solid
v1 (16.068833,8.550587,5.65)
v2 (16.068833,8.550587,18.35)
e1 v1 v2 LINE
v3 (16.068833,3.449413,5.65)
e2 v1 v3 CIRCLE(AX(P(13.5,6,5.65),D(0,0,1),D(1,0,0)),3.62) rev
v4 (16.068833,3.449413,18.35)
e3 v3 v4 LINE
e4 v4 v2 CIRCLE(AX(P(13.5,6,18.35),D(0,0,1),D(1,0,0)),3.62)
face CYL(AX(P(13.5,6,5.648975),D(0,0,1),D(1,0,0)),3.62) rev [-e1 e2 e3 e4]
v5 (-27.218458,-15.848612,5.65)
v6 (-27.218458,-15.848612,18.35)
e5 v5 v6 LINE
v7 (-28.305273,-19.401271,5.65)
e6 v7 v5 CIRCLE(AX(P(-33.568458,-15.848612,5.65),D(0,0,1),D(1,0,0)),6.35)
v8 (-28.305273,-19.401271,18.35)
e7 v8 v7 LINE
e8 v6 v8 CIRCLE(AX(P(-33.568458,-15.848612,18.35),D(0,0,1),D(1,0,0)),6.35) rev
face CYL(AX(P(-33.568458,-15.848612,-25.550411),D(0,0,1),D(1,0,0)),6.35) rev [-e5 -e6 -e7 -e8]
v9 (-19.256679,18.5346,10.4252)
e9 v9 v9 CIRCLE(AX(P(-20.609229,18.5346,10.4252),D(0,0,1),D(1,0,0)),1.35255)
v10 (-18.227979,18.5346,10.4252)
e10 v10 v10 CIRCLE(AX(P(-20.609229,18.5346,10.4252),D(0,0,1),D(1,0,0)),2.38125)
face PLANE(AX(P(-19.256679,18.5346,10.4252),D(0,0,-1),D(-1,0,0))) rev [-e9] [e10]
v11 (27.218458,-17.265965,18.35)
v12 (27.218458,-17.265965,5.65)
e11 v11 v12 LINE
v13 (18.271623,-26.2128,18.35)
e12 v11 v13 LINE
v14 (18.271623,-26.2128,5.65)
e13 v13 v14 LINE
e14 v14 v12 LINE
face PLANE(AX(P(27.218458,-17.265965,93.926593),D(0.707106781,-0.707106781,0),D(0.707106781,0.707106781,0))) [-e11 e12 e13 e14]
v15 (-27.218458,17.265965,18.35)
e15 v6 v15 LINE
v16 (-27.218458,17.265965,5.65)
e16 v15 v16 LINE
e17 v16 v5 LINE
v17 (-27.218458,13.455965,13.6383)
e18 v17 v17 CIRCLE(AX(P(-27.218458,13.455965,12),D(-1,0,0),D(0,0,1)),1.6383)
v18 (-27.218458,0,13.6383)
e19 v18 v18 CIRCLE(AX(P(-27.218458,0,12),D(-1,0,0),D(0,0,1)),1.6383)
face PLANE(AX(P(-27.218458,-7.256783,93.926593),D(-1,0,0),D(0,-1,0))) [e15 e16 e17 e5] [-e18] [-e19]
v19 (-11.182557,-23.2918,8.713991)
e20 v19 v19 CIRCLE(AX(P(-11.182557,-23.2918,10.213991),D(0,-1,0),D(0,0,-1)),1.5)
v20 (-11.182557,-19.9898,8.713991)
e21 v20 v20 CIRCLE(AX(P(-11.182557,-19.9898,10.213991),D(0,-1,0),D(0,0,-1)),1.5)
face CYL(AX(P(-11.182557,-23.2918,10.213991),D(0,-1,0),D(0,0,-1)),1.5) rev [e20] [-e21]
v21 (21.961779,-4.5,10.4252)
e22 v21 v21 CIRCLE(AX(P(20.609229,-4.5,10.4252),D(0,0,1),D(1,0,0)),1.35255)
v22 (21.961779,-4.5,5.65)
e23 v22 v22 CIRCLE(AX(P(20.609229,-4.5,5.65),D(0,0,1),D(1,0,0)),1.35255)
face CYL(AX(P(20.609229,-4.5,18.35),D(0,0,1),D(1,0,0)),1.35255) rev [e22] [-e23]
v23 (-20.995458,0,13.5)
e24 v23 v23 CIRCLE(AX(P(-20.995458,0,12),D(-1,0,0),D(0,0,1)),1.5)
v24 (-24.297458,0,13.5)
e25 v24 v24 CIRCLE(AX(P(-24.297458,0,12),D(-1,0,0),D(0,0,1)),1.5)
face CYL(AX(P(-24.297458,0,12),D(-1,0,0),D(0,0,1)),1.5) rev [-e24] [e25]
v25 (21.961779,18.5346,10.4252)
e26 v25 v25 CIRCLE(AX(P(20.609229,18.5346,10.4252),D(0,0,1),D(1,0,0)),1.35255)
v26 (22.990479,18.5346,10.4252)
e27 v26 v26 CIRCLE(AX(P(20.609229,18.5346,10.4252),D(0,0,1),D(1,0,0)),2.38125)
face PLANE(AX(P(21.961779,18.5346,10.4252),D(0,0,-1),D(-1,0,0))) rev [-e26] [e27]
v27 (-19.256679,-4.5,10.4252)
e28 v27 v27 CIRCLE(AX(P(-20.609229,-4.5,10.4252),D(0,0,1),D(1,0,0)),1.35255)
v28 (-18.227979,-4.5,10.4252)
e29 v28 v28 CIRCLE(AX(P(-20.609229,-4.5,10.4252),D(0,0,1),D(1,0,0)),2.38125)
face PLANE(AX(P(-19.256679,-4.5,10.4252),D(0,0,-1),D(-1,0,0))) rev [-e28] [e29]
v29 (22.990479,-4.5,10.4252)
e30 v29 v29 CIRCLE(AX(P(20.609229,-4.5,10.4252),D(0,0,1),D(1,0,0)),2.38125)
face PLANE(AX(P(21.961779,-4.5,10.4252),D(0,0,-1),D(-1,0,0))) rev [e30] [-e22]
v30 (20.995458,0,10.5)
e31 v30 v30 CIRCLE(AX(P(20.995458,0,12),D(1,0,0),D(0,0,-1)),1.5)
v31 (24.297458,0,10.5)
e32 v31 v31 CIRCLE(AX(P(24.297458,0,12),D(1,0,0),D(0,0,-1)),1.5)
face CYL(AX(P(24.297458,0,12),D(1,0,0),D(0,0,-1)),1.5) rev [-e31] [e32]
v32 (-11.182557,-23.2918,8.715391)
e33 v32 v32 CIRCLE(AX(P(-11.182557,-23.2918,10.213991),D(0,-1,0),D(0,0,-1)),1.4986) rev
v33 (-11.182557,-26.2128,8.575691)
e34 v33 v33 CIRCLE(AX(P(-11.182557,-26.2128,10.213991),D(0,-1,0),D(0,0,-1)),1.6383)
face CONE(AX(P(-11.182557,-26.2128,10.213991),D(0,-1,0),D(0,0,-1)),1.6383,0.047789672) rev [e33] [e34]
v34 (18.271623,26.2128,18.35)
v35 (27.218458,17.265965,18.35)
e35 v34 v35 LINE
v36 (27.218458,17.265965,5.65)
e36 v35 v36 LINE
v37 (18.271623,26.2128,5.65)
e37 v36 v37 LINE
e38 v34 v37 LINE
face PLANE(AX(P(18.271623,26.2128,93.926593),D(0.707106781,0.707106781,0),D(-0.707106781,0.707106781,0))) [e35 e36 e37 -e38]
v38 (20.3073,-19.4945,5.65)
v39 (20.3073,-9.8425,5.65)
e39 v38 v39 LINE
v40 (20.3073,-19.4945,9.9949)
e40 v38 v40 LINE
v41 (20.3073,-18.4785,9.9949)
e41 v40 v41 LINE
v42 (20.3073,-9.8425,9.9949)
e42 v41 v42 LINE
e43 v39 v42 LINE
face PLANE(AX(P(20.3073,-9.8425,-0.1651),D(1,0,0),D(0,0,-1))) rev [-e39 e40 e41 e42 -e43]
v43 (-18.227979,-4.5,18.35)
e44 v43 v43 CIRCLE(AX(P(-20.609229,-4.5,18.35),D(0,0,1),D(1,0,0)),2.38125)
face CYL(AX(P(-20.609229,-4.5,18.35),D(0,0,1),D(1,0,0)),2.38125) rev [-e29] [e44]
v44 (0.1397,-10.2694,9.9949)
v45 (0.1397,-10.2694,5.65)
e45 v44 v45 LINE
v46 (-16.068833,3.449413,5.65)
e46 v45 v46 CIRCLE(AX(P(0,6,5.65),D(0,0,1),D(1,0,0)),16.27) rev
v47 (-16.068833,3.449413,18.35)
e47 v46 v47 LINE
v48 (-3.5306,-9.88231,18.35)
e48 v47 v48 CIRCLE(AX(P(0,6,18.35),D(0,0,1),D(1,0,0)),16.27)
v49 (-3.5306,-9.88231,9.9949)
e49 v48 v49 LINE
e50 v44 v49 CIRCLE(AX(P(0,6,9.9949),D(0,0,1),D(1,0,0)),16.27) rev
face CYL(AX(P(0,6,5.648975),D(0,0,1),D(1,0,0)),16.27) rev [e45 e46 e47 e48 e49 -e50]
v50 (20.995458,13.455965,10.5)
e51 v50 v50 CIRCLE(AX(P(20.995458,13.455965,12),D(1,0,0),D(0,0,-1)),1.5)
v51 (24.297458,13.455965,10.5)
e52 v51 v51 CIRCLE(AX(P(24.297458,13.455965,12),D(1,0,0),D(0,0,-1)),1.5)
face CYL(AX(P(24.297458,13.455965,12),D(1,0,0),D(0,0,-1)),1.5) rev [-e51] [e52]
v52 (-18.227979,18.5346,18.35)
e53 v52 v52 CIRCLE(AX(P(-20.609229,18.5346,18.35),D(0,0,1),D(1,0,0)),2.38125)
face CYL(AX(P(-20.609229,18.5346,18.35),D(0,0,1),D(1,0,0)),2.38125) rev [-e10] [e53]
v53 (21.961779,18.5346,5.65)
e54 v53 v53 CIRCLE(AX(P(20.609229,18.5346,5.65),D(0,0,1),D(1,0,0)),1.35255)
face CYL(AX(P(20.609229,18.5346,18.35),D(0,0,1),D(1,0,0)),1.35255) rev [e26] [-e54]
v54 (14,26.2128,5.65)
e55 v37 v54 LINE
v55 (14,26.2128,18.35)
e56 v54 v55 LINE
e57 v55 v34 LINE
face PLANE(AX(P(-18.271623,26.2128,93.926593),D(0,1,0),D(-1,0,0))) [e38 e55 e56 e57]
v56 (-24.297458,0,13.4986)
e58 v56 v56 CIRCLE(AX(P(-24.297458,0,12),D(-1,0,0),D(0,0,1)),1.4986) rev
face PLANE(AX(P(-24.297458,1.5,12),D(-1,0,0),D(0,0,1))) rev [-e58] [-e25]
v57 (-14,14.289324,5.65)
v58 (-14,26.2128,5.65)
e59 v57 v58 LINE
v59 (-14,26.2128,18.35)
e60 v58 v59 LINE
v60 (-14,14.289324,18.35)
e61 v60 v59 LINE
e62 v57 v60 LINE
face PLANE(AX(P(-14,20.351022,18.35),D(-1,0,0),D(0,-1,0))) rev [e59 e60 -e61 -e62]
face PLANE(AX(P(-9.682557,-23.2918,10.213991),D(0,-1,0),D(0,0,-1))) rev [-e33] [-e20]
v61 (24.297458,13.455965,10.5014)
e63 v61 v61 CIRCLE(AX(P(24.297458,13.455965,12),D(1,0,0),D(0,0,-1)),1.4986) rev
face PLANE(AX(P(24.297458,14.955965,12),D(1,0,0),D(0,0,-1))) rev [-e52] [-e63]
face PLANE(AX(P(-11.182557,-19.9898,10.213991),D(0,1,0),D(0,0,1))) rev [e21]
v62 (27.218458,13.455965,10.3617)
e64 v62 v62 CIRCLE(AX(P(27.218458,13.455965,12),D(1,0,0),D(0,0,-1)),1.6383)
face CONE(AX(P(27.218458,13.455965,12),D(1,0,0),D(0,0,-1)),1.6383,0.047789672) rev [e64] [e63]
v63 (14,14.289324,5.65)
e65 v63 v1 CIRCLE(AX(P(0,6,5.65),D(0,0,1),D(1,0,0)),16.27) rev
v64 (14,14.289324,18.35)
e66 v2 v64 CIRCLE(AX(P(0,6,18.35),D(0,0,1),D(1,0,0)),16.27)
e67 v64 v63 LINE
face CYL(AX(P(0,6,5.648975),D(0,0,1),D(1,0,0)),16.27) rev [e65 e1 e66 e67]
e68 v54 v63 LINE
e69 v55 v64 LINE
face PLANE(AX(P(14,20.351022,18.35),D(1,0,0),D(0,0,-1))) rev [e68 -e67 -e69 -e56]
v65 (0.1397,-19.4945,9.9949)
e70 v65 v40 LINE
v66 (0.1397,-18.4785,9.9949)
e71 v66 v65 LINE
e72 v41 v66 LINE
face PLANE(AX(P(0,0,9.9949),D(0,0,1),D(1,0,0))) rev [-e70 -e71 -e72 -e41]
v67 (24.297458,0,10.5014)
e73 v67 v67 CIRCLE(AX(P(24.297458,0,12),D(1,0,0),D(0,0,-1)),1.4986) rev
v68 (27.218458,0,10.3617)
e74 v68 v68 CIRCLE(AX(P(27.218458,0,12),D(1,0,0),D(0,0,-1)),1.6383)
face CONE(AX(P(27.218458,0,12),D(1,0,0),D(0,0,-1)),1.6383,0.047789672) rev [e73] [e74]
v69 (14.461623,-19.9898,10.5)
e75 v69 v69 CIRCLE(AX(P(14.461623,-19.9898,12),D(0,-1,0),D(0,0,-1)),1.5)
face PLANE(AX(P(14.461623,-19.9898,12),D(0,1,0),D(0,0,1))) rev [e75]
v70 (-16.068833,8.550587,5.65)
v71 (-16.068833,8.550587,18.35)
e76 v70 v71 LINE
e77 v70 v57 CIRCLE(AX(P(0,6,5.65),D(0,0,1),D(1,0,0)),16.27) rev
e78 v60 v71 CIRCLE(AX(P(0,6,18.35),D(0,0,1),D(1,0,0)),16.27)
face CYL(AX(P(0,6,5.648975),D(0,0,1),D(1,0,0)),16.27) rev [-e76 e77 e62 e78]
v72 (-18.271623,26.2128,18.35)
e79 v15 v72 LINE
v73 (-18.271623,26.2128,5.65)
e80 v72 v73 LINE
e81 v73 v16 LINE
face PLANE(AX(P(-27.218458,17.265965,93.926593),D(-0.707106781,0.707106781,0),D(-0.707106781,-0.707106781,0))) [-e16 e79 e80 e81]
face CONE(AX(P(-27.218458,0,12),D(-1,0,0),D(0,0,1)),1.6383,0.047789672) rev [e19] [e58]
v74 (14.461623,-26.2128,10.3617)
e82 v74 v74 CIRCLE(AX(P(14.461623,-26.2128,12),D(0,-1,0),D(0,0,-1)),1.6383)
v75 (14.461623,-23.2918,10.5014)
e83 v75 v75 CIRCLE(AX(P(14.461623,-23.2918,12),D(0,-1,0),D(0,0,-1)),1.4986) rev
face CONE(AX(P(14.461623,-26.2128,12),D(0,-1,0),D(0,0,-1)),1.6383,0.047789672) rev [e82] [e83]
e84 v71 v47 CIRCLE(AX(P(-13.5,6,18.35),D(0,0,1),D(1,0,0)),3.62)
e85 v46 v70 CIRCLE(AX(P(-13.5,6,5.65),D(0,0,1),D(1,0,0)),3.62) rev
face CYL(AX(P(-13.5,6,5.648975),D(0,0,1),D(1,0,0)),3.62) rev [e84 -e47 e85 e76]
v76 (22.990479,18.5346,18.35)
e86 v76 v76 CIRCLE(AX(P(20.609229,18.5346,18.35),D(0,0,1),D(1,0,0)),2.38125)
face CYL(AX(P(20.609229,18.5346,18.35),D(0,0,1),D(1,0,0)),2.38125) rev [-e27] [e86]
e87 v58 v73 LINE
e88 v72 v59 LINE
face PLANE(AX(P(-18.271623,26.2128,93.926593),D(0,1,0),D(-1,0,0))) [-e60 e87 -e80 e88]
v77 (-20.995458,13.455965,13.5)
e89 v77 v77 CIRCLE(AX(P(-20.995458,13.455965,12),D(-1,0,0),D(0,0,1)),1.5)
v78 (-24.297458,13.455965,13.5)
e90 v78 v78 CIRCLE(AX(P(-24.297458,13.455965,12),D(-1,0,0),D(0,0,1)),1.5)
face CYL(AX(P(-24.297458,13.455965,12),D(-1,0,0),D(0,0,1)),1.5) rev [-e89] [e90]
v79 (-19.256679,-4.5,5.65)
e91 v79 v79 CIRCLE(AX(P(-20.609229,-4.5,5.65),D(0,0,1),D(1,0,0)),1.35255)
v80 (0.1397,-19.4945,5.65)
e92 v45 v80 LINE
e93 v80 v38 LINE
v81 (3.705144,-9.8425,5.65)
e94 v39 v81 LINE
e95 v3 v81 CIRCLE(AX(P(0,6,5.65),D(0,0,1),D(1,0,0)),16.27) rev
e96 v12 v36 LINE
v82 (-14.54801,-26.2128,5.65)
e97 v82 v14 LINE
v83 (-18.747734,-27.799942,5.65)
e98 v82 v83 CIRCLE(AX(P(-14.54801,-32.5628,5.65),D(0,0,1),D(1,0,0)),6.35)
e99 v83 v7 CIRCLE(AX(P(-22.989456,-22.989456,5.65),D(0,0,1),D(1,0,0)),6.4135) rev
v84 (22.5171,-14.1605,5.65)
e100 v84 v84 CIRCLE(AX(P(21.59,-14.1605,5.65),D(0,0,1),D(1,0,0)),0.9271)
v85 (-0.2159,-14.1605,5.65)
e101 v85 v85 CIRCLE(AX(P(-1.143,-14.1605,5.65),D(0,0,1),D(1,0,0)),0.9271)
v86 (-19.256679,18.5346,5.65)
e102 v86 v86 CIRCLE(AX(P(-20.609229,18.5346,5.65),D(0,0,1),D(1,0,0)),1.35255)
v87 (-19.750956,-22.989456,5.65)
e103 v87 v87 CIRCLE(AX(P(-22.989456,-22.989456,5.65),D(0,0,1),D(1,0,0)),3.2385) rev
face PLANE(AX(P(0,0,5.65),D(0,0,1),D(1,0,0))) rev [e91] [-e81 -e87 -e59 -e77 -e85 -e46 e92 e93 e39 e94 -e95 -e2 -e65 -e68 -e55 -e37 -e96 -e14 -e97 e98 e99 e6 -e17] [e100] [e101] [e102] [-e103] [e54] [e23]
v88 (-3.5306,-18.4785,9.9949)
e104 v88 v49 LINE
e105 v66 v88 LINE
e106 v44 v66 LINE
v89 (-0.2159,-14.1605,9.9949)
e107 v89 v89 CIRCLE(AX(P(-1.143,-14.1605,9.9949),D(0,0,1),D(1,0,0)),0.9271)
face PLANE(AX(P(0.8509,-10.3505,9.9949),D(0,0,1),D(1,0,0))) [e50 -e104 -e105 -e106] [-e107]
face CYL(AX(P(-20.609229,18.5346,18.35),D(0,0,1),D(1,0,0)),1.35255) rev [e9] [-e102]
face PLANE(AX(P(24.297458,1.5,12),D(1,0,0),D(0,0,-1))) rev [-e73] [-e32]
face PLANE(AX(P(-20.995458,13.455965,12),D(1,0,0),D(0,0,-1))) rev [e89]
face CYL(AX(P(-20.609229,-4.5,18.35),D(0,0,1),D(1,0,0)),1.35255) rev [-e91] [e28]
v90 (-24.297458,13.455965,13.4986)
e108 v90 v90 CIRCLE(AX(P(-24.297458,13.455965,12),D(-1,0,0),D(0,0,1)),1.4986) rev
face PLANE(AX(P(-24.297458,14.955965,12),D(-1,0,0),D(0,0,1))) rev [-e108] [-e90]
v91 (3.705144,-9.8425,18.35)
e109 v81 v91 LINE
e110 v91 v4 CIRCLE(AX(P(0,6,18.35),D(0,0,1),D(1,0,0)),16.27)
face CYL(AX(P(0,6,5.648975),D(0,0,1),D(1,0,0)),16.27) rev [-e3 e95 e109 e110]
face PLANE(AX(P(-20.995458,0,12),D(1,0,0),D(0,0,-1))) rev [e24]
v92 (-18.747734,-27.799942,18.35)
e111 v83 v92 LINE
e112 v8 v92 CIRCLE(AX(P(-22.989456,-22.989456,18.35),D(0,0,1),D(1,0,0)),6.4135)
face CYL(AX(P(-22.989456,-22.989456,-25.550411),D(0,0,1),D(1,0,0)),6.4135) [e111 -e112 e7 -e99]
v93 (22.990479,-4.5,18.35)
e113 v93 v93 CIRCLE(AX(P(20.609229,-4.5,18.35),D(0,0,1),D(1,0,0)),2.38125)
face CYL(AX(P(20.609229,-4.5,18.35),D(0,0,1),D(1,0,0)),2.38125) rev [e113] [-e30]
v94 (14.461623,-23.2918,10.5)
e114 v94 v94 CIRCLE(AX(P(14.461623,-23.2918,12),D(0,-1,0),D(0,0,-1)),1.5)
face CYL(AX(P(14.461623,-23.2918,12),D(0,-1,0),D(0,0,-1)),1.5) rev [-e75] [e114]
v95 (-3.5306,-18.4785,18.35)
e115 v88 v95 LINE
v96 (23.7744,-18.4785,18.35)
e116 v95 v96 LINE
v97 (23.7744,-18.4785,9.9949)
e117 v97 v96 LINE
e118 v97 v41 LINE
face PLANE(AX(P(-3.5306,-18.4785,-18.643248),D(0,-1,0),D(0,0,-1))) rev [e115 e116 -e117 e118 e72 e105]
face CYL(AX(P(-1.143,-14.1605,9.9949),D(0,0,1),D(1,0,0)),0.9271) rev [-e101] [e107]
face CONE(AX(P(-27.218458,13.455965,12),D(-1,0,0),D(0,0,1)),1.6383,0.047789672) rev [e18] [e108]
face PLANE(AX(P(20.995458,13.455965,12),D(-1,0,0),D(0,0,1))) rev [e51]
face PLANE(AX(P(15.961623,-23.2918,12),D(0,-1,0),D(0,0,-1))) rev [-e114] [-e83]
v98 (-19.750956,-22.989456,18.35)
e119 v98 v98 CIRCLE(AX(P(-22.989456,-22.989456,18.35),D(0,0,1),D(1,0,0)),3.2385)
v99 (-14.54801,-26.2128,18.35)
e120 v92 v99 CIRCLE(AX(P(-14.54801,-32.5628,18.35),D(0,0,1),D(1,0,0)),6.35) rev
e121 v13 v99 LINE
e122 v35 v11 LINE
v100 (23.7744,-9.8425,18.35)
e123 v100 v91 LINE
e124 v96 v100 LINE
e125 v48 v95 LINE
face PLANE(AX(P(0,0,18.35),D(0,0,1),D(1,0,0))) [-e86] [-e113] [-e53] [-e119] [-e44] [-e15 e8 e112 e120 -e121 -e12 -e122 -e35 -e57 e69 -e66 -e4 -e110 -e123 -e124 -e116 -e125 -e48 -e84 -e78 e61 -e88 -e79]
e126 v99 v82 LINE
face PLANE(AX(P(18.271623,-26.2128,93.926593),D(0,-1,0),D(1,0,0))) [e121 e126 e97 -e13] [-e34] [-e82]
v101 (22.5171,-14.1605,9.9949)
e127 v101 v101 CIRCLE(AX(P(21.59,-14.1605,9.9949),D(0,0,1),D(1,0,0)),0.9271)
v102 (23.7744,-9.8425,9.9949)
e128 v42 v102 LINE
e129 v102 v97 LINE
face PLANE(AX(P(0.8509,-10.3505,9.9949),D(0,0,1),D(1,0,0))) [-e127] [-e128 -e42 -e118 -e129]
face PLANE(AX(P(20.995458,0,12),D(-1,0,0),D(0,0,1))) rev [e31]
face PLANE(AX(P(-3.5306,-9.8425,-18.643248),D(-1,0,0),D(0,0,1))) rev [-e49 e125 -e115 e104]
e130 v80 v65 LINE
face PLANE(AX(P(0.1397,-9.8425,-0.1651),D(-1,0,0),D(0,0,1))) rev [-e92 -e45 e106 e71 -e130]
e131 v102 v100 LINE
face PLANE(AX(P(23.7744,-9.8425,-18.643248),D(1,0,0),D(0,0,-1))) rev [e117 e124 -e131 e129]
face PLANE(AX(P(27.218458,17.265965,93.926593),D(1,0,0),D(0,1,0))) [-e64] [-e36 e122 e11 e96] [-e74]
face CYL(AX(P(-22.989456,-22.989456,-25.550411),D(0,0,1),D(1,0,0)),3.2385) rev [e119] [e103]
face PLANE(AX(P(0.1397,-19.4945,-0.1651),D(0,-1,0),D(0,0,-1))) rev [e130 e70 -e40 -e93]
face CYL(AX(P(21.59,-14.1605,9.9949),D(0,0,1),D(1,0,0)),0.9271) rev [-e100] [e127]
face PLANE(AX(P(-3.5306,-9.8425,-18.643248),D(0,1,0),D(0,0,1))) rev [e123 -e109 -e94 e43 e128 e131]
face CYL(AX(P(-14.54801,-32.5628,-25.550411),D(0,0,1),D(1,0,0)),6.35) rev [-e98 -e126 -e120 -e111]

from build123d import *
from build123d.topology import SkipClean

# Parameters (mm, degrees)
SKETCH1_R                                       = 24.7015
SKETCH1_R_2                                     = 7.9375
BOSS_EXTRUDE1_DEPTH                             = 5.65
CBORE_SLOT_FOR_2_PAN_HEAD_MACHINE_SCREW_DEPTH   = 7
CBORE_SLOT_FOR_2_PAN_HEAD_MACHINE_S_3_DEPTH     = 1.5748
BOSS_EXTRUDE5_DEPTH                             = 12.7
BOSS_EXTRUDE8_DEPTH                             = 18.35
CUT_EXTRUDE3_DEPTH                              = 5.65
BOSS_EXTRUDE10_START                            = -12.7
SKETCH49_R                                      = 3.2385
BOSS_EXTRUDE10_DEPTH                            = 12.7
FILLET6_R                                       = 6.35
CBORE_FOR_2_PAN_HEAD_MACHINE_SCREW1_D           = 2.7051
CBORE_FOR_2_PAN_HEAD_MACHINE_SCREW1_CBORE_D     = 4.7625
CBORE_FOR_2_PAN_HEAD_MACHINE_SCREW1_CBORE_DEPTH = 7.9248
CUT_EXTRUDE5_START                              = -8.3551
SKETCH53_W                                      = 27.305
SKETCH53_H                                      = 8.636
CUT_EXTRUDE5_DEPTH                              = 8.3551
SKETCH54_W                                      = 20.1676
SKETCH54_H                                      = 9.652
CUT_EXTRUDE6_DEPTH                              = 10.16
CUT_EXTRUDE7_DEPTH                              = 44.478242884
CUT_EXTRUDE7_DEPTH_BACK                         = 44.478242884
SKETCH55_W                                      = 28
SKETCH55_H                                      = 5.861777857
F_0_CLEARANCE_HOLE1_D                           = 1.8542
FILLET7_R                                       = 6.35
SKETCH61_W                                      = 1.5
SKETCH61_H                                      = 3.302
SKETCH61_AT_POINT_2_W                           = 1.5
SKETCH61_AT_POINT_2_H                           = 3.302
SKETCH61_AT_POINT_3_W                           = 1.5
SKETCH61_AT_POINT_3_H                           = 3.302
SKETCH61_AT_POINT_4_W                           = 1.5
SKETCH61_AT_POINT_4_H                           = 3.302
SKETCH61_AT_POINT_5_W                           = 1.5
SKETCH61_AT_POINT_5_H                           = 3.302
SKETCH61_AT_POINT_6_W                           = 1.5
SKETCH61_AT_POINT_6_H                           = 3.302
CUT_EXTRUDE8_REACH                              = 45.478


with BuildPart() as part:
    # Sketch1 → Boss-Extrude1 (new body)
    with BuildSketch(Plane.XY):
        with Locations(Location((0, 0, 0), (0, 0, 180))):
            Circle(SKETCH1_R)
        with Locations(Location((0, 0, 0), (0, 0, 180))):
            Circle(SKETCH1_R_2, mode=Mode.SUBTRACT)
    extrude(amount=BOSS_EXTRUDE1_DEPTH)

    # CBORE SLOT for #2 Pan Head Machine Screw1: read off the stored shape, not the designer's step
    # CBORE SLOT for _2 Pan Head Machine S 2 → CBORE SLOT for #2 Pan Head Machine Screw1 (cut)
    with BuildSketch(Plane.XY):
        with BuildLine():
            ThreePointArc((-6.14045, 18.210667628), (-7.493, 19.563217628), (-8.84555, 18.210667628))
            Line((-8.84555, 18.210667628), (-8.84555, 14.565767628))
            ThreePointArc((-8.84555, 14.565767628), (-7.493, 13.213217628), (-6.14045, 14.565767628))
            Line((-6.14045, 14.565767628), (-6.14045, 18.210667628))
        make_face()
        with BuildLine():
            ThreePointArc((3.35915, 18.210667628), (2.0066, 19.563217628), (0.65405, 18.210667628))
            Line((0.65405, 18.210667628), (0.65405, 14.565767628))
            ThreePointArc((0.65405, 14.565767628), (2.0066, 13.213217628), (3.35915, 14.565767628))
            Line((3.35915, 14.565767628), (3.35915, 18.210667628))
        make_face()
    extrude(amount=CBORE_SLOT_FOR_2_PAN_HEAD_MACHINE_SCREW_DEPTH, mode=Mode.SUBTRACT)

    # CBORE SLOT for _2 Pan Head Machine S 3 o → CBORE SLOT for _2 Pan Head Machine S 3 (cut)
    # profile 1 of 2: a face of its own
    with BuildSketch(Plane.XY):
        with BuildLine():
            ThreePointArc((-5.11175, 18.210667628), (-7.493, 20.591917628), (-9.87425, 18.210667628))
            Line((-9.87425, 18.210667628), (-9.87425, 14.565767628))
            ThreePointArc((-9.87425, 14.565767628), (-7.493, 12.184517628), (-5.11175, 14.565767628))
            Line((-5.11175, 14.565767628), (-5.11175, 18.210667628))
        make_face()
        with BuildLine():
            Line((-8.84555, 14.565767628), (-8.84555, 18.210667628))
            ThreePointArc((-8.84555, 18.210667628), (-7.493, 19.563217628), (-6.14045, 18.210667628))
            Line((-6.14045, 18.210667628), (-6.14045, 14.565767628))
            ThreePointArc((-6.14045, 14.565767628), (-7.493, 13.213217628), (-8.84555, 14.565767628))
        make_face(mode=Mode.SUBTRACT)
    # profile 2 of 2: a face of its own
    with BuildSketch(Plane.XY):
        with BuildLine():
            ThreePointArc((4.38785, 18.210667628), (2.0066, 20.591917628), (-0.37465, 18.210667628))
            Line((-0.37465, 18.210667628), (-0.37465, 14.565767628))
            ThreePointArc((-0.37465, 14.565767628), (2.0066, 12.184517628), (4.38785, 14.565767628))
            Line((4.38785, 14.565767628), (4.38785, 18.210667628))
        make_face()
        with BuildLine():
            Line((0.65405, 14.565767628), (0.65405, 18.210667628))
            ThreePointArc((0.65405, 18.210667628), (2.0066, 19.563217628), (3.35915, 18.210667628))
            Line((3.35915, 18.210667628), (3.35915, 14.565767628))
            ThreePointArc((3.35915, 14.565767628), (2.0066, 13.213217628), (0.65405, 14.565767628))
        make_face(mode=Mode.SUBTRACT)
    extrude(amount=CBORE_SLOT_FOR_2_PAN_HEAD_MACHINE_S_3_DEPTH, mode=Mode.SUBTRACT)

    # CBORE SLOT for _2 Pan Head Machine S 4: loft between two sections, ruled curve by curve
    cbore_slot_for_2_pan_head_machine_s_4_from = [
        Edge.make_three_point_arc((-9.87425, 18.210667628, 1.03251), (-9.176798023, 19.89446565, 1.03251), (-7.493, 20.591917628, 1.03251)),
        Edge.make_three_point_arc((-7.493, 20.591917628, 1.03251), (-5.809201977, 19.89446565, 1.03251), (-5.11175, 18.210667628, 1.03251)),
        Edge.make_three_point_arc((-5.11175, 14.565767628, 1.03251), (-5.809201977, 12.881969605, 1.03251), (-7.493, 12.184517628, 1.03251)),
        Edge.make_three_point_arc((-7.493, 12.184517628, 1.03251), (-9.176798023, 12.881969605, 1.03251), (-9.87425, 14.565767628, 1.03251)),
        Edge.make_line((-5.11175, 18.210667628, 1.03251), (-5.11175, 14.565767628, 1.03251)),
        Edge.make_line((-9.87425, 18.210667628, 1.03251), (-9.87425, 14.565767628, 1.03251)),
    ]
    cbore_slot_for_2_pan_head_machine_s_4_to = [
        Edge.make_three_point_arc((-10.90676, 18.210667628, 0), (-9.906892845, 20.624560473, 0), (-7.493, 21.624427628, 0)),
        Edge.make_three_point_arc((-7.493, 21.624427628, 0), (-5.079107155, 20.624560473, 0), (-4.07924, 18.210667628, 0)),
        Edge.make_three_point_arc((-4.07924, 14.565767628, 0), (-5.079107155, 12.151874782, 0), (-7.493, 11.152007628, 0)),
        Edge.make_three_point_arc((-7.493, 11.152007628, 0), (-9.906892845, 12.151874782, 0), (-10.90676, 14.565767628, 0)),
        Edge.make_line((-4.07924, 18.210667628, 0), (-4.07924, 14.565767628, 0)),
        Edge.make_line((-10.90676, 18.210667628, 0), (-10.90676, 14.565767628, 0)),
    ]
    cbore_slot_for_2_pan_head_machine_s_4 = Solid(Shell([*[Face.make_surface_from_curves(cbore_slot_for_2_pan_head_machine_s_4_from[k], cbore_slot_for_2_pan_head_machine_s_4_to[k]) for k in range(6)], Face(Wire(cbore_slot_for_2_pan_head_machine_s_4_from)), Face(Wire(cbore_slot_for_2_pan_head_machine_s_4_to))]))
    add(cbore_slot_for_2_pan_head_machine_s_4, mode=Mode.SUBTRACT)

    # CBORE SLOT for _2 Pan Head Machine S 5: loft between two sections, ruled curve by curve
    cbore_slot_for_2_pan_head_machine_s_5_from = [
        Edge.make_three_point_arc((-0.37465, 18.210667628, 1.03251), (0.322801977, 19.89446565, 1.03251), (2.0066, 20.591917628, 1.03251)),
        Edge.make_three_point_arc((2.0066, 20.591917628, 1.03251), (3.690398023, 19.89446565, 1.03251), (4.38785, 18.210667628, 1.03251)),
        Edge.make_three_point_arc((4.38785, 14.565767628, 1.03251), (3.690398023, 12.881969605, 1.03251), (2.0066, 12.184517628, 1.03251)),
        Edge.make_three_point_arc((2.0066, 12.184517628, 1.03251), (0.322801977, 12.881969605, 1.03251), (-0.37465, 14.565767628, 1.03251)),
        Edge.make_line((4.38785, 18.210667628, 1.03251), (4.38785, 14.565767628, 1.03251)),
        Edge.make_line((-0.37465, 18.210667628, 1.03251), (-0.37465, 14.565767628, 1.03251)),
    ]
    cbore_slot_for_2_pan_head_machine_s_5_to = [
        Edge.make_three_point_arc((-1.40716, 18.210667628, 0), (-0.407292845, 20.624560473, 0), (2.0066, 21.624427628, 0)),
        Edge.make_three_point_arc((2.0066, 21.624427628, 0), (4.420492845, 20.624560473, 0), (5.42036, 18.210667628, 0)),
        Edge.make_three_point_arc((5.42036, 14.565767628, 0), (4.420492845, 12.151874782, 0), (2.0066, 11.152007628, 0)),
        Edge.make_three_point_arc((2.0066, 11.152007628, 0), (-0.407292845, 12.151874782, 0), (-1.40716, 14.565767628, 0)),
        Edge.make_line((5.42036, 18.210667628, 0), (5.42036, 14.565767628, 0)),
        Edge.make_line((-1.40716, 18.210667628, 0), (-1.40716, 14.565767628, 0)),
    ]
    cbore_slot_for_2_pan_head_machine_s_5 = Solid(Shell([*[Face.make_surface_from_curves(cbore_slot_for_2_pan_head_machine_s_5_from[k], cbore_slot_for_2_pan_head_machine_s_5_to[k]) for k in range(6)], Face(Wire(cbore_slot_for_2_pan_head_machine_s_5_from)), Face(Wire(cbore_slot_for_2_pan_head_machine_s_5_to))]))
    add(cbore_slot_for_2_pan_head_machine_s_5, mode=Mode.SUBTRACT)

    # Sketch11 → Boss-Extrude5 (add)
    with SkipClean():  # the faces are left unmerged after this step: merging them gives an invalid solid
        with BuildSketch(Plane.XY.offset(5.65)):
            with BuildLine():
                Line((-14, -4.5), (0.074191584, -4.5))
                Line((0.074191584, -4.5), (14, -4.5))
                Line((14, -4.5), (14, 20.351022143))
                ThreePointArc((14, 20.351022143), (0, -24.7015), (-14, 20.351022143))
                Line((-14, 20.351022143), (-14, -4.5))
            make_face()
        extrude(amount=BOSS_EXTRUDE5_DEPTH)

    # Sketch32 → Boss-Extrude8 (add)
    with SkipClean():  # the faces are left unmerged after this step: merging them gives an invalid solid
        with BuildSketch(Plane(origin=(0, 0, 0), x_dir=(-1, 0, 0), z_dir=(0, 0, -1))):
            with BuildLine():
                Line((-18.271623193, -26.2128), (7.425405769, -26.2128))
                ThreePointArc((7.425405769, -26.2128), (11.449135046, -24.775243659), (13.651025729, -21.113462268))
                ThreePointArc((13.651025729, -21.113462268), (13.71963315, -20.799474974), (13.798794659, -20.487981067))
                ThreePointArc((13.798794659, -20.487981067), (-17.466598155, 17.466598155), (20.487981067, -13.798794659))
                ThreePointArc((20.487981067, -13.798794659), (21.098318373, -13.654080759), (21.716857056, -13.549851983))
                ThreePointArc((21.716857056, -13.549851983), (25.649139633, -11.436206614), (27.21845798, -7.256782858))
                Line((27.21845798, -7.256782858), (27.21845798, 17.265965213))
                Line((27.21845798, 17.265965213), (18.271623193, 26.2128))
                Line((18.271623193, 26.2128), (-18.271623193, 26.2128))
                Line((-18.271623193, 26.2128), (-27.21845798, 17.265965213))
                Line((-27.21845798, 17.265965213), (-27.21845798, -17.265965213))
                Line((-27.21845798, -17.265965213), (-18.271623193, -26.2128))
            make_face()
        extrude(amount=-BOSS_EXTRUDE8_DEPTH)

    # Sketch36 → Cut-Extrude3 (cut)
    with BuildSketch(Plane(origin=(0, 0, 0), x_dir=(-1, 0, 0), z_dir=(0, 0, -1))):
        with BuildLine():
            Line((27.21845798, -7.256782858), (27.21845798, 17.265965213))
            Line((27.21845798, 17.265965213), (18.271623193, 26.2128))
            Line((18.271623193, 26.2128), (-18.271623193, 26.2128))
            Line((-18.271623193, 26.2128), (-27.21845798, 17.265965213))
            Line((-27.21845798, 17.265965213), (-27.21845798, -17.265965213))
            Line((-27.21845798, -17.265965213), (-18.271623193, -26.2128))
            Line((-18.271623193, -26.2128), (7.425405769, -26.2128))
            ThreePointArc((7.425405769, -26.2128), (11.449135046, -24.775243659), (13.651025729, -21.113462268))
            ThreePointArc((13.651025729, -21.113462268), (13.71963315, -20.799474974), (13.798794659, -20.487981067))
            ThreePointArc((13.798794659, -20.487981067), (17.466598155, -17.466598155), (20.487981067, -13.798794659))
            ThreePointArc((20.487981067, -13.798794659), (21.098318373, -13.654080759), (21.716857056, -13.549851983))
            ThreePointArc((21.716857056, -13.549851983), (25.649139633, -11.436206614), (27.21845798, -7.256782858))
        make_face()
    extrude(amount=-CUT_EXTRUDE3_DEPTH, mode=Mode.SUBTRACT)

    # Sketch49 → Boss-Extrude10 (add)
    with BuildSketch(Plane.XY.offset(18.35).offset(BOSS_EXTRUDE10_START)):
        with BuildLine():
            Line((-7.425405769, -26.2128), (-17.444815593, -26.2128))
            ThreePointArc((-17.444815593, -26.2128), (-27.06539703, -27.941191152), (-27.21845798, -18.167783584))
            Line((-27.21845798, -18.167783584), (-27.21845798, -7.256782858))
            ThreePointArc((-27.21845798, -7.256782858), (-25.649139633, -11.436206614), (-21.716857056, -13.549851983))
            ThreePointArc((-21.716857056, -13.549851983), (-21.098318373, -13.654080759), (-20.487981067, -13.798794659))
            ThreePointArc((-20.487981067, -13.798794659), (-17.466598155, -17.466598155), (-13.798794659, -20.487981067))
            ThreePointArc((-13.798794659, -20.487981067), (-13.71963315, -20.799474974), (-13.651025729, -21.113462268))
            ThreePointArc((-13.651025729, -21.113462268), (-11.449135046, -24.775243659), (-7.425405769, -26.2128))
        make_face()
        with Locations((-22.98945567, -22.98945567)):
            Circle(SKETCH49_R, mode=Mode.SUBTRACT)
    extrude(amount=BOSS_EXTRUDE10_DEPTH)

    # Fillet6
    fillet6_edges = [part.edges().sort_by_distance(p)[0] for p in [
        (-27.21845798, -18.167783584, 12),
        (-17.444815593, -26.2128, 12),
    ]]
    fillet(fillet6_edges, radius=FILLET6_R)

    # CBORE for #2 Pan Head Machine Screw1 (through all)
    with Locations(Plane.XY.offset(18.35)):
        with Locations((-20.60922899, 18.5346), (-20.60922899, -4.5), (20.60922899, -4.5), (20.60922899, 18.5346)):
            CounterBoreHole(CBORE_FOR_2_PAN_HEAD_MACHINE_SCREW1_D / 2, CBORE_FOR_2_PAN_HEAD_MACHINE_SCREW1_CBORE_D / 2, CBORE_FOR_2_PAN_HEAD_MACHINE_SCREW1_CBORE_DEPTH)

    # Sketch53 → Cut-Extrude5 (cut)
    with BuildSketch(Plane.XY.offset(18.35).offset(CUT_EXTRUDE5_START)):
        with Locations((10.1219, -14.1605)):
            Rectangle(SKETCH53_W, SKETCH53_H)
    extrude(amount=CUT_EXTRUDE5_DEPTH, mode=Mode.SUBTRACT)

    # Sketch54 → Cut-Extrude6 (cut)
    with BuildSketch(Plane.XY.offset(9.9949)):
        with Locations((10.2235, -14.6685)):
            Rectangle(SKETCH54_W, SKETCH54_H)
    extrude(amount=-CUT_EXTRUDE6_DEPTH, mode=Mode.SUBTRACT)

    # Sketch55 → Cut-Extrude7 (cut, two sides: drawn at the far end of the back side and taken through both)
    with BuildSketch(Plane.XY.offset(18.35).offset(-CUT_EXTRUDE7_DEPTH_BACK)):
        with Locations((0, 23.281911072)):
            Rectangle(SKETCH55_W, SKETCH55_H)
    extrude(amount=CUT_EXTRUDE7_DEPTH + CUT_EXTRUDE7_DEPTH_BACK, mode=Mode.SUBTRACT)

    # #0 Clearance Hole1 (through all)
    with Locations(Plane.XY.offset(9.9949)):
        with Locations((-1.143, -14.1605), (21.59, -14.1605)):
            Hole(F_0_CLEARANCE_HOLE1_D / 2)

    # Fillet7
    fillet7_edges = [part.edges().sort_by_distance(p)[0] for p in [
        (14, -4.5, 12),
        (-14, -4.5, 12),
    ]]
    fillet(fillet7_edges, radius=FILLET7_R)

    # Sketch60 → Hole5 (revolve, cut)
    with BuildSketch(Plane(origin=(27.21845798, 13.455965213, 12), x_dir=(0, 0, -1), z_dir=(0, 1, 0))):
        Polygon((0, 0), (0, 2.921), (1.4986, 2.921), (1.6383, 0), align=None)
    revolve(axis=Axis((-82.78154202, 13.455965213, 12), (1, 0, 0)), mode=Mode.SUBTRACT)

    # Sketch60 at point 2 (carried to point 2, square into its face) → Hole5 at 2 (revolve, cut)
    with BuildSketch(Plane(origin=(27.21845798, 0, 12), x_dir=(0, 0, -1), z_dir=(0, 1, 0))):
        Polygon((0, 0), (0, 2.921), (1.4986, 2.921), (1.6383, 0), align=None)
    revolve(axis=Axis((-82.78154202, 0, 12), (1, 0, 0)), mode=Mode.SUBTRACT)

    # Sketch60 at point 3 (carried to point 3, square into its face) → Hole5 at 3 (revolve, cut)
    with BuildSketch(Plane(origin=(-11.182556809, -26.2128, 10.213991308), x_dir=(0, 0, -1), z_dir=(1, 0, 0))):
        Polygon((0, 0), (0, 2.921), (1.4986, 2.921), (1.6383, 0), align=None)
    revolve(axis=Axis((-11.182556809, 83.7872, 10.213991308), (0, -1, 0)), mode=Mode.SUBTRACT)

    # Sketch60 at point 4 (carried to point 4, square into its face) → Hole5 at 4 (revolve, cut)
    with BuildSketch(Plane(origin=(14.461623193, -26.2128, 12), x_dir=(0, 0, -1), z_dir=(1, 0, 0))):
        Polygon((0, 0), (0, 2.921), (1.4986, 2.921), (1.6383, 0), align=None)
    revolve(axis=Axis((14.461623193, 83.7872, 12), (0, -1, 0)), mode=Mode.SUBTRACT)

    # Sketch60 at point 5 (carried to point 5, square into its face) → Hole5 at 5 (revolve, cut)
    with BuildSketch(Plane(origin=(-27.21845798, 13.455965213, 12), x_dir=(0, 0, -1), z_dir=(0, -1, 0))):
        Polygon((0, 0), (0, 2.921), (1.4986, 2.921), (1.6383, 0), align=None)
    revolve(axis=Axis((82.78154202, 13.455965213, 12), (-1, 0, 0)), mode=Mode.SUBTRACT)

    # Sketch60 at point 6 (carried to point 6, square into its face) → Hole5 at 6 (revolve, cut)
    with BuildSketch(Plane(origin=(-27.21845798, 0, 12), x_dir=(0, 0, -1), z_dir=(0, -1, 0))):
        Polygon((0, 0), (0, 2.921), (1.4986, 2.921), (1.6383, 0), align=None)
    revolve(axis=Axis((82.78154202, 0, 12), (-1, 0, 0)), mode=Mode.SUBTRACT)

    # Sketch61 → Ø3.0 (3) Diameter Hole1 (revolve, cut)
    with BuildSketch(Plane(origin=(-11.182556809, -23.2918, 10.213991308), x_dir=(0, 0, -1), z_dir=(1, 0, 0))):
        with Locations((0.75, 1.651)):
            Rectangle(SKETCH61_W, SKETCH61_H)
    revolve(axis=Axis((-11.182556809, -29.6418, 10.213991308), (0, 1, 0)), mode=Mode.SUBTRACT)

    # Sketch61 at point 2 (carried to point 2, square into its face) → Ø3.0 (3) Diameter Hole1 at 2 (revolve, cut)
    with BuildSketch(Plane(origin=(14.461623193, -23.2918, 12), x_dir=(0, 0, -1), z_dir=(1, 0, 0))):
        with Locations((0.75, 1.651)):
            Rectangle(SKETCH61_AT_POINT_2_W, SKETCH61_AT_POINT_2_H)
    revolve(axis=Axis((14.461623193, -29.6418, 12), (0, 1, 0)), mode=Mode.SUBTRACT)

    # Sketch61 at point 3 (carried to point 3, square into its face) → Ø3.0 (3) Diameter Hole1 at 3 (revolve, cut)
    with BuildSketch(Plane(origin=(24.29745798, 0, 12), x_dir=(0, 0, -1), z_dir=(0, 1, 0))):
        with Locations((0.75, 1.651)):
            Rectangle(SKETCH61_AT_POINT_3_W, SKETCH61_AT_POINT_3_H)
    revolve(axis=Axis((30.64745798, 0, 12), (-1, 0, 0)), mode=Mode.SUBTRACT)

    # Sketch61 at point 4 (carried to point 4, square into its face) → Ø3.0 (3) Diameter Hole1 at 4 (revolve, cut)
    with BuildSketch(Plane(origin=(24.29745798, 13.455965213, 12), x_dir=(0, 0, -1), z_dir=(0, 1, 0))):
        with Locations((0.75, 1.651)):
            Rectangle(SKETCH61_AT_POINT_4_W, SKETCH61_AT_POINT_4_H)
    revolve(axis=Axis((30.64745798, 13.455965213, 12), (-1, 0, 0)), mode=Mode.SUBTRACT)

    # Sketch61 at point 5 (carried to point 5, square into its face) → Ø3.0 (3) Diameter Hole1 at 5 (revolve, cut)
    with BuildSketch(Plane(origin=(-24.29745798, 13.455965213, 12), x_dir=(0, 0, -1), z_dir=(0, -1, 0))):
        with Locations((0.75, 1.651)):
            Rectangle(SKETCH61_AT_POINT_5_W, SKETCH61_AT_POINT_5_H)
    revolve(axis=Axis((-30.64745798, 13.455965213, 12), (1, 0, 0)), mode=Mode.SUBTRACT)

    # Sketch61 at point 6 (carried to point 6, square into its face) → Ø3.0 (3) Diameter Hole1 at 6 (revolve, cut)
    with BuildSketch(Plane(origin=(-24.29745798, 0, 12), x_dir=(0, 0, -1), z_dir=(0, -1, 0))):
        with Locations((0.75, 1.651)):
            Rectangle(SKETCH61_AT_POINT_6_W, SKETCH61_AT_POINT_6_H)
    revolve(axis=Axis((-30.64745798, 0, 12), (1, 0, 0)), mode=Mode.SUBTRACT)

    # Sketch62 → Cut-Extrude8 (cut, up to next)
    with BuildSketch(Plane.XY.offset(18.35), mode=Mode.PRIVATE) as cut_extrude8_sk1:
        with BuildLine():
            Line((4.72101684, 21.57), (-4.72101684, 21.57))
            ThreePointArc((-4.72101684, 21.57), (-12.265021185, 16.690283221), (-16.068833333, 8.550587247))
            ThreePointArc((-16.068833333, 8.550587247), (-17.12, 6), (-16.068833333, 3.449412753))
            ThreePointArc((-16.068833333, 3.449412753), (0, -10.27), (16.068833333, 3.449412753))
            ThreePointArc((16.068833333, 3.449412753), (17.12, 6), (16.068833333, 8.550587247))
            ThreePointArc((16.068833333, 8.550587247), (12.265021185, 16.690283221), (4.72101684, 21.57))
        make_face()
    cut_extrude8_tool1 = extrude(cut_extrude8_sk1.sketch, amount=-CUT_EXTRUDE8_REACH, mode=Mode.PRIVATE) & part.part
    add(cut_extrude8_tool1.solids().sort_by_distance((0, 5.91581, 18.35))[0], mode=Mode.SUBTRACT)


solid = part.part
